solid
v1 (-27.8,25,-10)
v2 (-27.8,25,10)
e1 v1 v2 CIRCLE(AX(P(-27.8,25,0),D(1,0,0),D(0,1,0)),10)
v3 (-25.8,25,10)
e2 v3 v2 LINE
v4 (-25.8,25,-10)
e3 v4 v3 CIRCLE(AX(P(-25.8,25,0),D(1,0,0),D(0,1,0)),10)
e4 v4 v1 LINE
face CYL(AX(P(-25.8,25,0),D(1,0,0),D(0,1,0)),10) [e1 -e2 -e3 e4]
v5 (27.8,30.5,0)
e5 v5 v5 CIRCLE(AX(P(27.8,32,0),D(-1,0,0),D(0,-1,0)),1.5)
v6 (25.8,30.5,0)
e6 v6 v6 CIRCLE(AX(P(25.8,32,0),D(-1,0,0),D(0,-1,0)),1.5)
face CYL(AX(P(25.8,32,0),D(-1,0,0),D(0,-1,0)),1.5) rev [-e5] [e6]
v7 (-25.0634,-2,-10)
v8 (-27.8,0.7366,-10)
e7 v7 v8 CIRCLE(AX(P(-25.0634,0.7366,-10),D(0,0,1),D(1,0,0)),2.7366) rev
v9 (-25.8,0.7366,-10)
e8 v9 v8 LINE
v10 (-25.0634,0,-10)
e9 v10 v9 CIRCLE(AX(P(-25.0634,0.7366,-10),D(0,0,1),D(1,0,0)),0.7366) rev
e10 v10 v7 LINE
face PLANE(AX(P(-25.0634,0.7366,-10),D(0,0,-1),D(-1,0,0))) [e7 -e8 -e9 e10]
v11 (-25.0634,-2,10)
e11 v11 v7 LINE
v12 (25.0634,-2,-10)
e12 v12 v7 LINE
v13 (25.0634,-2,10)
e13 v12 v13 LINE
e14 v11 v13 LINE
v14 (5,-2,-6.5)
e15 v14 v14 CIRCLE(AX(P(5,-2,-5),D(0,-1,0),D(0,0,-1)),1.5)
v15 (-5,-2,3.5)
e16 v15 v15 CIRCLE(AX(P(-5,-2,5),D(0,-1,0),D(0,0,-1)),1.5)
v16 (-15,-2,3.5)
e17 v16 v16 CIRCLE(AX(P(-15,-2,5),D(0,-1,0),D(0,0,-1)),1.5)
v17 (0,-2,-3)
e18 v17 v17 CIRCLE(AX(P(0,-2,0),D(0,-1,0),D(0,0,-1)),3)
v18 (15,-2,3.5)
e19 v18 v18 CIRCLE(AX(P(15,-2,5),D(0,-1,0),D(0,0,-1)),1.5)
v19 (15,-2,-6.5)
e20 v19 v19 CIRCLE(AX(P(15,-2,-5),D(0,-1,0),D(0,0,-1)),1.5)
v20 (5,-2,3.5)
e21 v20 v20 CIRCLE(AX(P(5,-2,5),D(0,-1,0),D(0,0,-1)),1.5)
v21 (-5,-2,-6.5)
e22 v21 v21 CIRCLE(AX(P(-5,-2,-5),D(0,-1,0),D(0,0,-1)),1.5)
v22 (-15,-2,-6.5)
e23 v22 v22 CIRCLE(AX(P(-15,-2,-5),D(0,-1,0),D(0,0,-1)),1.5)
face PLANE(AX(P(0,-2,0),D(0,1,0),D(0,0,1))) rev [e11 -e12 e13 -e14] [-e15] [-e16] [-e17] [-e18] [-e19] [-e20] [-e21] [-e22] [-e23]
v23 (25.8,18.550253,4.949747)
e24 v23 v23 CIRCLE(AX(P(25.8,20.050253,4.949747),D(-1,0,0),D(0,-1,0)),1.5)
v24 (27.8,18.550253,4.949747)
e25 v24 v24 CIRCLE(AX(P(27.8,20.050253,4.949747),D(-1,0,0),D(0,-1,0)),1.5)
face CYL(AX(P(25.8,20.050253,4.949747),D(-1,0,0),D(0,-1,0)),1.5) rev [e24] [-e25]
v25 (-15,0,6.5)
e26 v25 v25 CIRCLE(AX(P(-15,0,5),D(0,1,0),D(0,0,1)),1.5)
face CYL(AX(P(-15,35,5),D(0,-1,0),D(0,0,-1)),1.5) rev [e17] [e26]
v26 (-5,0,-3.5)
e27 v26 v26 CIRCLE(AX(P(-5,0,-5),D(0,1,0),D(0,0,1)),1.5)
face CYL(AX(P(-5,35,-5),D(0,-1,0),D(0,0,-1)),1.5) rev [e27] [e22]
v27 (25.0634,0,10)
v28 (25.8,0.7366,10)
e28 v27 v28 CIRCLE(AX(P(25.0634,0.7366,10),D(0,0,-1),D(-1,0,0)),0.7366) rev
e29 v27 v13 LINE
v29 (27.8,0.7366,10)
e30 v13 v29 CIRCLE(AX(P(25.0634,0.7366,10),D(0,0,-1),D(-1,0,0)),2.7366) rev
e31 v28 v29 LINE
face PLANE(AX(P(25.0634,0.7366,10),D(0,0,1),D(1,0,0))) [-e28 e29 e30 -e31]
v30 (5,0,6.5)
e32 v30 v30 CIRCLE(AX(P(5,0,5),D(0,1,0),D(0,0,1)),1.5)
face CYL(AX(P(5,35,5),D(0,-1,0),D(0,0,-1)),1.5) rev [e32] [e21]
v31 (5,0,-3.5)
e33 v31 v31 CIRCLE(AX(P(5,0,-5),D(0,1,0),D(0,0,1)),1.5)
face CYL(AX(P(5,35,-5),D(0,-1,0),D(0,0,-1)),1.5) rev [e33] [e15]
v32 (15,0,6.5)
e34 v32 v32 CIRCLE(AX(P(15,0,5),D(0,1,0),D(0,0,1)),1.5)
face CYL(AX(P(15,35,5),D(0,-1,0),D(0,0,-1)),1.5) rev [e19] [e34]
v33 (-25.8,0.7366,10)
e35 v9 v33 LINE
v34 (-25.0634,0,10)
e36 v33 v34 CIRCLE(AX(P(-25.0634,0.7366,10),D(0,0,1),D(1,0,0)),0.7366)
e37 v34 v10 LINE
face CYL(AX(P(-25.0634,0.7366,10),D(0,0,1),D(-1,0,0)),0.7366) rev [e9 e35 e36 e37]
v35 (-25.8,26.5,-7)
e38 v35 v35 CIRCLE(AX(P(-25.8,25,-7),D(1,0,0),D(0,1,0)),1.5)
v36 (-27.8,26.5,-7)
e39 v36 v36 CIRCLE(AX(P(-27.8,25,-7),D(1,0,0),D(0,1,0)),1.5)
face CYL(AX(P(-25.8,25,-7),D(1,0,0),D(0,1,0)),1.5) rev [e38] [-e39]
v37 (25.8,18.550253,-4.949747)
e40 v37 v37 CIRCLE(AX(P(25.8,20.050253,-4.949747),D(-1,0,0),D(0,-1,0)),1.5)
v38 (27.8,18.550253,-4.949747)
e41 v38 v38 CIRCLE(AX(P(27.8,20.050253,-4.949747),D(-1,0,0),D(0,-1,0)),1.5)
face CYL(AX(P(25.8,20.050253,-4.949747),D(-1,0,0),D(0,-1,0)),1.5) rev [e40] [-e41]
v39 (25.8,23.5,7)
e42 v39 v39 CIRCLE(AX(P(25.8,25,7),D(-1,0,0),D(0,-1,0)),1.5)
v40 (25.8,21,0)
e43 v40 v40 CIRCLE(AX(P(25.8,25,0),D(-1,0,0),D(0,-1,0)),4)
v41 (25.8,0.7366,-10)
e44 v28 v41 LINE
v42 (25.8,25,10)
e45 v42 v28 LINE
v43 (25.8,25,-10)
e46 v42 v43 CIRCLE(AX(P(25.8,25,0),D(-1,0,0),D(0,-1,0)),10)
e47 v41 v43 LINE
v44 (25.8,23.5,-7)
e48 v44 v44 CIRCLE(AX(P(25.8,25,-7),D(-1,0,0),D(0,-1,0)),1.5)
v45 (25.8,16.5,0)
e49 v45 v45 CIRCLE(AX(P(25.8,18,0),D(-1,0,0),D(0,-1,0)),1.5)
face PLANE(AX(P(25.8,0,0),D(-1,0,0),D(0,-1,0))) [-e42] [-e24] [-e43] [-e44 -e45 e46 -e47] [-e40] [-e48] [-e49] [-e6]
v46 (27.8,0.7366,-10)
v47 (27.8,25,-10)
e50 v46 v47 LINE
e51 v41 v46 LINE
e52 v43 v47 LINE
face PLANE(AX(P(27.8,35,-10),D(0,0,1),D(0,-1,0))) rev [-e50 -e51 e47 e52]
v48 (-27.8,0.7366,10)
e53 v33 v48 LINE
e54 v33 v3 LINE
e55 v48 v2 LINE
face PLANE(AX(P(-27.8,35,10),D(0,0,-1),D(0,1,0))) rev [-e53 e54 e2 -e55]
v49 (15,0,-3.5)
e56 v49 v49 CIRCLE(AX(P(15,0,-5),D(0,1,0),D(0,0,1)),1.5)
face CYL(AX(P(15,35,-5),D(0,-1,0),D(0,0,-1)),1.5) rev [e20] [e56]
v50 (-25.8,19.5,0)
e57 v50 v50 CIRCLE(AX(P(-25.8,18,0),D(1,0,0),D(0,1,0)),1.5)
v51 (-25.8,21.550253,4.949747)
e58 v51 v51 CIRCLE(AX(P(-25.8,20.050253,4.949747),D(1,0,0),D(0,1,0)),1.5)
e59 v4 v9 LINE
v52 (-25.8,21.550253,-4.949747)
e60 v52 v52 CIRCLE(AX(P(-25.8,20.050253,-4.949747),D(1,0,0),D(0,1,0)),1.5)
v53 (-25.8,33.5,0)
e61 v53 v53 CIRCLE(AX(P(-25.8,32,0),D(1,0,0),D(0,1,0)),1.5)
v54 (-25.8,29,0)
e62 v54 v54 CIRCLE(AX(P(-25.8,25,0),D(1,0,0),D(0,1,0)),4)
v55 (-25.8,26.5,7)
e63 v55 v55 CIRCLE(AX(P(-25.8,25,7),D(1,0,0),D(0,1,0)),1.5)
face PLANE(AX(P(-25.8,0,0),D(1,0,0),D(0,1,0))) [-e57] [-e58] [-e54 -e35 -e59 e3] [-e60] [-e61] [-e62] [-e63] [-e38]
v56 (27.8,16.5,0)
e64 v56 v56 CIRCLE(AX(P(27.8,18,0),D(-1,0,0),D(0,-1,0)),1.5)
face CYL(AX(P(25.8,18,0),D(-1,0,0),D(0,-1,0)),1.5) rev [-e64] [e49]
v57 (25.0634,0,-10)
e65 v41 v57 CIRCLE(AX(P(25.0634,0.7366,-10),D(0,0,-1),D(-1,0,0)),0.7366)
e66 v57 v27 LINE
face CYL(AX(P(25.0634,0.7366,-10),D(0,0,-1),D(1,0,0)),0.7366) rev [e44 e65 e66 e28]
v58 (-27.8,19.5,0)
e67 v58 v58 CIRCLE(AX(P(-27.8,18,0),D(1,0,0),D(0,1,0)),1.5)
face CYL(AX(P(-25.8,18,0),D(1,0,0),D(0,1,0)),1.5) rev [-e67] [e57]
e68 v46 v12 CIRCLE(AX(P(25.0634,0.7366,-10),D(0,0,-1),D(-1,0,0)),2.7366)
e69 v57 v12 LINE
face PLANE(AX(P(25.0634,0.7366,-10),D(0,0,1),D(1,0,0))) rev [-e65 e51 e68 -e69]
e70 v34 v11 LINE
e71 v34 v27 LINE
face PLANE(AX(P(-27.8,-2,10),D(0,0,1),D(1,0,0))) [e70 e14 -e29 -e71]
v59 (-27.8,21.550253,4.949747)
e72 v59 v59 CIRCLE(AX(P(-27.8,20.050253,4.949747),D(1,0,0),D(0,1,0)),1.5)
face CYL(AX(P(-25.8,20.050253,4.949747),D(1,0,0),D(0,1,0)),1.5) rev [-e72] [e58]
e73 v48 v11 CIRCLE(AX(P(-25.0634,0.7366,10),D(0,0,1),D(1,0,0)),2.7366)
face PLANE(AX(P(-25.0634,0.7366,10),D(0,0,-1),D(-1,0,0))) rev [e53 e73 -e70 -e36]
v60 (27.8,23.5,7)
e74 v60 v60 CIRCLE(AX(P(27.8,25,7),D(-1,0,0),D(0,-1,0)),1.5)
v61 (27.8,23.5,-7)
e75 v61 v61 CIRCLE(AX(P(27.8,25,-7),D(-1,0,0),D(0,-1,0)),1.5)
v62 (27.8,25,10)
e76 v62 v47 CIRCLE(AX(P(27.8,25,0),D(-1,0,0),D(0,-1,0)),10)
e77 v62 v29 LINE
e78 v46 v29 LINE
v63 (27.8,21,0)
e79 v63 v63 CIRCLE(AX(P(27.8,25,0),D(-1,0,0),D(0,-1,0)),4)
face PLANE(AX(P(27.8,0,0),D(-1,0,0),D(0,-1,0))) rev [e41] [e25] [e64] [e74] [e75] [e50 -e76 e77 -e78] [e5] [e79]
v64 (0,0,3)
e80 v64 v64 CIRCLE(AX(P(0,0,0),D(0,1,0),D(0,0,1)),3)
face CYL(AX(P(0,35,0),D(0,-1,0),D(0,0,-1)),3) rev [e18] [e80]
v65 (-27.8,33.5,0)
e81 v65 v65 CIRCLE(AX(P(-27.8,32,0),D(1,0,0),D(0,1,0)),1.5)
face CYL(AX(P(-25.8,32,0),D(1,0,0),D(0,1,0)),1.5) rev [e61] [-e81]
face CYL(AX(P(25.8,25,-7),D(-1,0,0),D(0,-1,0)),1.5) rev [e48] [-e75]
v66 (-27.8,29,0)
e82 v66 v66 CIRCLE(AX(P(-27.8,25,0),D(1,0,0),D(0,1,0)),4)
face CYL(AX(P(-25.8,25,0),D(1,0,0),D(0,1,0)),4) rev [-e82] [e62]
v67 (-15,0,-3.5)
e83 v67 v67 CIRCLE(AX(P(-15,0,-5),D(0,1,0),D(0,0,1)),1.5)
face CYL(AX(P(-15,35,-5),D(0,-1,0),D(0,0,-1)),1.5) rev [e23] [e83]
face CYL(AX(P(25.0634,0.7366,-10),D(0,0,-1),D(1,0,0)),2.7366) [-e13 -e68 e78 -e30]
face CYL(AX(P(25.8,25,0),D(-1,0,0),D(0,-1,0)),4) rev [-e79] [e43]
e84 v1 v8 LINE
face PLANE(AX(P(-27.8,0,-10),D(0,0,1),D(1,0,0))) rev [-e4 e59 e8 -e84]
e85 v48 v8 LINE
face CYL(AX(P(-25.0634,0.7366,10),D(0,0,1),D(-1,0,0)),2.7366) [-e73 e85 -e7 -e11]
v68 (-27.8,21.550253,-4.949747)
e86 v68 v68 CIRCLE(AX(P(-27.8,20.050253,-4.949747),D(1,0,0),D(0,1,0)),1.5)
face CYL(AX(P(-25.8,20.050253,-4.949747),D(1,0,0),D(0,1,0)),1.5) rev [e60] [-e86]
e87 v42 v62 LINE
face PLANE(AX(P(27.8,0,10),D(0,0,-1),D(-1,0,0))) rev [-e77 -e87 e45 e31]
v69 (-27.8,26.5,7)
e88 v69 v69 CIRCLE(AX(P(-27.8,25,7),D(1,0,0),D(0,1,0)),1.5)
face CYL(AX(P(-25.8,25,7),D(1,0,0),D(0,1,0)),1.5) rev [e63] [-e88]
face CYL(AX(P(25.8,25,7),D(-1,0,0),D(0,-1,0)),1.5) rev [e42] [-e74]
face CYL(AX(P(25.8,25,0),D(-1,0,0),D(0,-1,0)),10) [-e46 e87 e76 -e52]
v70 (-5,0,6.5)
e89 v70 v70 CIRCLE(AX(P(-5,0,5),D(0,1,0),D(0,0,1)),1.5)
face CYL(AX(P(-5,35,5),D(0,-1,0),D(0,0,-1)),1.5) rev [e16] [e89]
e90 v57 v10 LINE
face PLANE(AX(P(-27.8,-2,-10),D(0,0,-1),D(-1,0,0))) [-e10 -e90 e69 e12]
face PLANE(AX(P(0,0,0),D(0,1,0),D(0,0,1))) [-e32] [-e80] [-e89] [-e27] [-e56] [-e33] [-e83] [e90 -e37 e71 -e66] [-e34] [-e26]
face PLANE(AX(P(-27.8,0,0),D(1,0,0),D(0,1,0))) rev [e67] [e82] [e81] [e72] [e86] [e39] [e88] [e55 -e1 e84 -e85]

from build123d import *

# Parameters (mm, degrees)
SKETCH_1_W                         = 55.6
SKETCH_1_H                         = 20
SM_BASE_FLANGE_1_DEPTH             = 2
SM_EDGE_FLANGE_1_STRIP_W           = 9.4732
SM_EDGE_FLANGE_1_STRIP_H           = 2
SM_EDGE_FLANGE_1_STRIP_CUT_DEPTH   = 20
SM_EDGE_FLANGE_1_STRIP_2_W         = 9.4732
SM_EDGE_FLANGE_1_STRIP_2_H         = 2
SM_EDGE_FLANGE_1_STRIP_CUT_2_DEPTH = 20
SM_EDGE_FLANGE_1_DEPTH             = 20
SM_EDGE_FLANGE_1_BEND_DEPTH        = 20
SKETCH_12_R                        = 1.5
CUT_EXTRUDE_1_DEPTH                = 67.45569953
SKETCH_13_R                        = 3
SKETCH_13_R_2                      = 1.5
CUT_EXTRUDE_2_DEPTH                = 48.348072822


# Sheet-metal steps are written as plain solids
with BuildPart() as part:
    # Sketch 1 → 基体-法兰1 (new body)
    with BuildSketch(Plane(origin=(0, 0, 0), x_dir=(1, 0, 0), z_dir=(0, 1, 0))):
        Rectangle(SKETCH_1_W, SKETCH_1_H)
    extrude(amount=-SM_BASE_FLANGE_1_DEPTH)

    # 边线-法兰1 strip (across the edge) → 边线-法兰1 strip cut (cut)
    with BuildSketch(Plane(origin=(-27.8, 0, -10), x_dir=(1, 0, 0), z_dir=(0, 0, 1))):
        with Locations((-2, -1)):
            Rectangle(SM_EDGE_FLANGE_1_STRIP_W, SM_EDGE_FLANGE_1_STRIP_H)
    extrude(amount=SM_EDGE_FLANGE_1_STRIP_CUT_DEPTH, mode=Mode.SUBTRACT)

    # 边线-法兰1 strip 2 (across the edge) → 边线-法兰1 strip cut 2 (cut)
    with BuildSketch(Plane(origin=(27.8, 0, 10), x_dir=(-1, 0, 0), z_dir=(0, 0, -1))):
        with Locations((-2, -1)):
            Rectangle(SM_EDGE_FLANGE_1_STRIP_2_W, SM_EDGE_FLANGE_1_STRIP_2_H)
    extrude(amount=SM_EDGE_FLANGE_1_STRIP_CUT_2_DEPTH, mode=Mode.SUBTRACT)

    # 边线-法兰1 section (across the edge) → 边线-法兰1 (add)
    with BuildSketch(Plane(origin=(-27.8, 0, -10), x_dir=(1, 0, 0), z_dir=(0, 0, 1))):
        with BuildLine():
            Line((0, 0.7366), (0, 35))
            Line((0, 35), (2, 35))
            Line((2, 35), (2, 0.7366))
            ThreePointArc((2, 0.7366), (2.215745145, 0.215745145), (2.7366, 0))
            Line((2.7366, 0), (2.7366, -2))
            ThreePointArc((2.7366, -2), (0.801531583, -1.198468417), (0, 0.7366))
        make_face()
    extrude(amount=SM_EDGE_FLANGE_1_DEPTH)

    # 边线-法兰1 section 2 (across the edge) → 边线-法兰1 bend (add)
    with BuildSketch(Plane(origin=(27.8, 0, 10), x_dir=(-1, 0, 0), z_dir=(0, 0, -1))):
        with BuildLine():
            Line((0, 0.7366), (0, 35))
            Line((0, 35), (2, 35))
            Line((2, 35), (2, 0.7366))
            ThreePointArc((2, 0.7366), (2.215745145, 0.215745145), (2.7366, 0))
            Line((2.7366, 0), (2.7366, -2))
            ThreePointArc((2.7366, -2), (0.801531583, -1.198468417), (0, 0.7366))
        make_face()
    extrude(amount=SM_EDGE_FLANGE_1_BEND_DEPTH)

    # 草图12 → 切除-拉伸1 (cut, through all)
    with BuildSketch(Plane(origin=(27.8, 0, 0), x_dir=(0, 0, -1), z_dir=(1, 0, 0))):
        with BuildLine():
            Line((-10, 35), (-10, 25))
            ThreePointArc((-10, 25), (-7.071067812, 32.071067812), (0, 35))
            Line((0, 35), (-10, 35))
        make_face()
        with BuildLine():
            ThreePointArc((0, 35), (7.071067812, 32.071067812), (10, 25))
            Line((10, 25), (10, 35))
            Line((10, 35), (0, 35))
        make_face()
        with BuildLine():
            ThreePointArc((0, 29), (-4, 25), (0, 21))
            Line((0, 21), (0, 29))
        make_face()
        with BuildLine():
            Line((0, 29), (0, 21))
            ThreePointArc((0, 21), (2.828427125, 22.171572875), (4, 25))
            ThreePointArc((4, 25), (2.828427125, 27.828427125), (0, 29))
        make_face()
        with Locations(Location((-7, 25, 0), (0, 0, 90))):
            Circle(SKETCH_12_R)
        with Locations(Location((-4.949747468, 20.050252532, 0), (0, 0, 90))):
            Circle(SKETCH_12_R)
        with Locations(Location((0, 18, 0), (0, 0, 90))):
            Circle(SKETCH_12_R)
        with Locations(Location((4.949747468, 20.050252532, 0), (0, 0, 90))):
            Circle(SKETCH_12_R)
        with Locations(Location((7, 25, 0), (0, 0, 90))):
            Circle(SKETCH_12_R)
        with Locations(Location((0, 32, 0), (0, 0, 90))):
            Circle(SKETCH_12_R)
    extrude(amount=-CUT_EXTRUDE_1_DEPTH, mode=Mode.SUBTRACT)

    # 草图13 → 切除-拉伸2 (cut, through all)
    with BuildSketch(Plane.XZ.offset(2)):
        with Locations(Location((0, 0, 0), (0, 0, 270))):
            Circle(SKETCH_13_R)
        with Locations(Location((-15, 5, 0), (0, 0, 270))):
            Circle(SKETCH_13_R_2)
        with Locations(Location((-5, 5, 0), (0, 0, 270))):
            Circle(SKETCH_13_R_2)
        with Locations(Location((5, 5, 0), (0, 0, 270))):
            Circle(SKETCH_13_R_2)
        with Locations(Location((15, 5, 0), (0, 0, 270))):
            Circle(SKETCH_13_R_2)
        with Locations(Location((-5, -5, 0), (0, 0, 270))):
            Circle(SKETCH_13_R_2)
        with Locations(Location((5, -5, 0), (0, 0, 270))):
            Circle(SKETCH_13_R_2)
        with Locations(Location((15, -5, 0), (0, 0, 270))):
            Circle(SKETCH_13_R_2)
        with Locations(Location((-15, -5, 0), (0, 0, 270))):
            Circle(SKETCH_13_R_2)
    extrude(amount=-CUT_EXTRUDE_2_DEPTH, mode=Mode.SUBTRACT)


solid = part.part
